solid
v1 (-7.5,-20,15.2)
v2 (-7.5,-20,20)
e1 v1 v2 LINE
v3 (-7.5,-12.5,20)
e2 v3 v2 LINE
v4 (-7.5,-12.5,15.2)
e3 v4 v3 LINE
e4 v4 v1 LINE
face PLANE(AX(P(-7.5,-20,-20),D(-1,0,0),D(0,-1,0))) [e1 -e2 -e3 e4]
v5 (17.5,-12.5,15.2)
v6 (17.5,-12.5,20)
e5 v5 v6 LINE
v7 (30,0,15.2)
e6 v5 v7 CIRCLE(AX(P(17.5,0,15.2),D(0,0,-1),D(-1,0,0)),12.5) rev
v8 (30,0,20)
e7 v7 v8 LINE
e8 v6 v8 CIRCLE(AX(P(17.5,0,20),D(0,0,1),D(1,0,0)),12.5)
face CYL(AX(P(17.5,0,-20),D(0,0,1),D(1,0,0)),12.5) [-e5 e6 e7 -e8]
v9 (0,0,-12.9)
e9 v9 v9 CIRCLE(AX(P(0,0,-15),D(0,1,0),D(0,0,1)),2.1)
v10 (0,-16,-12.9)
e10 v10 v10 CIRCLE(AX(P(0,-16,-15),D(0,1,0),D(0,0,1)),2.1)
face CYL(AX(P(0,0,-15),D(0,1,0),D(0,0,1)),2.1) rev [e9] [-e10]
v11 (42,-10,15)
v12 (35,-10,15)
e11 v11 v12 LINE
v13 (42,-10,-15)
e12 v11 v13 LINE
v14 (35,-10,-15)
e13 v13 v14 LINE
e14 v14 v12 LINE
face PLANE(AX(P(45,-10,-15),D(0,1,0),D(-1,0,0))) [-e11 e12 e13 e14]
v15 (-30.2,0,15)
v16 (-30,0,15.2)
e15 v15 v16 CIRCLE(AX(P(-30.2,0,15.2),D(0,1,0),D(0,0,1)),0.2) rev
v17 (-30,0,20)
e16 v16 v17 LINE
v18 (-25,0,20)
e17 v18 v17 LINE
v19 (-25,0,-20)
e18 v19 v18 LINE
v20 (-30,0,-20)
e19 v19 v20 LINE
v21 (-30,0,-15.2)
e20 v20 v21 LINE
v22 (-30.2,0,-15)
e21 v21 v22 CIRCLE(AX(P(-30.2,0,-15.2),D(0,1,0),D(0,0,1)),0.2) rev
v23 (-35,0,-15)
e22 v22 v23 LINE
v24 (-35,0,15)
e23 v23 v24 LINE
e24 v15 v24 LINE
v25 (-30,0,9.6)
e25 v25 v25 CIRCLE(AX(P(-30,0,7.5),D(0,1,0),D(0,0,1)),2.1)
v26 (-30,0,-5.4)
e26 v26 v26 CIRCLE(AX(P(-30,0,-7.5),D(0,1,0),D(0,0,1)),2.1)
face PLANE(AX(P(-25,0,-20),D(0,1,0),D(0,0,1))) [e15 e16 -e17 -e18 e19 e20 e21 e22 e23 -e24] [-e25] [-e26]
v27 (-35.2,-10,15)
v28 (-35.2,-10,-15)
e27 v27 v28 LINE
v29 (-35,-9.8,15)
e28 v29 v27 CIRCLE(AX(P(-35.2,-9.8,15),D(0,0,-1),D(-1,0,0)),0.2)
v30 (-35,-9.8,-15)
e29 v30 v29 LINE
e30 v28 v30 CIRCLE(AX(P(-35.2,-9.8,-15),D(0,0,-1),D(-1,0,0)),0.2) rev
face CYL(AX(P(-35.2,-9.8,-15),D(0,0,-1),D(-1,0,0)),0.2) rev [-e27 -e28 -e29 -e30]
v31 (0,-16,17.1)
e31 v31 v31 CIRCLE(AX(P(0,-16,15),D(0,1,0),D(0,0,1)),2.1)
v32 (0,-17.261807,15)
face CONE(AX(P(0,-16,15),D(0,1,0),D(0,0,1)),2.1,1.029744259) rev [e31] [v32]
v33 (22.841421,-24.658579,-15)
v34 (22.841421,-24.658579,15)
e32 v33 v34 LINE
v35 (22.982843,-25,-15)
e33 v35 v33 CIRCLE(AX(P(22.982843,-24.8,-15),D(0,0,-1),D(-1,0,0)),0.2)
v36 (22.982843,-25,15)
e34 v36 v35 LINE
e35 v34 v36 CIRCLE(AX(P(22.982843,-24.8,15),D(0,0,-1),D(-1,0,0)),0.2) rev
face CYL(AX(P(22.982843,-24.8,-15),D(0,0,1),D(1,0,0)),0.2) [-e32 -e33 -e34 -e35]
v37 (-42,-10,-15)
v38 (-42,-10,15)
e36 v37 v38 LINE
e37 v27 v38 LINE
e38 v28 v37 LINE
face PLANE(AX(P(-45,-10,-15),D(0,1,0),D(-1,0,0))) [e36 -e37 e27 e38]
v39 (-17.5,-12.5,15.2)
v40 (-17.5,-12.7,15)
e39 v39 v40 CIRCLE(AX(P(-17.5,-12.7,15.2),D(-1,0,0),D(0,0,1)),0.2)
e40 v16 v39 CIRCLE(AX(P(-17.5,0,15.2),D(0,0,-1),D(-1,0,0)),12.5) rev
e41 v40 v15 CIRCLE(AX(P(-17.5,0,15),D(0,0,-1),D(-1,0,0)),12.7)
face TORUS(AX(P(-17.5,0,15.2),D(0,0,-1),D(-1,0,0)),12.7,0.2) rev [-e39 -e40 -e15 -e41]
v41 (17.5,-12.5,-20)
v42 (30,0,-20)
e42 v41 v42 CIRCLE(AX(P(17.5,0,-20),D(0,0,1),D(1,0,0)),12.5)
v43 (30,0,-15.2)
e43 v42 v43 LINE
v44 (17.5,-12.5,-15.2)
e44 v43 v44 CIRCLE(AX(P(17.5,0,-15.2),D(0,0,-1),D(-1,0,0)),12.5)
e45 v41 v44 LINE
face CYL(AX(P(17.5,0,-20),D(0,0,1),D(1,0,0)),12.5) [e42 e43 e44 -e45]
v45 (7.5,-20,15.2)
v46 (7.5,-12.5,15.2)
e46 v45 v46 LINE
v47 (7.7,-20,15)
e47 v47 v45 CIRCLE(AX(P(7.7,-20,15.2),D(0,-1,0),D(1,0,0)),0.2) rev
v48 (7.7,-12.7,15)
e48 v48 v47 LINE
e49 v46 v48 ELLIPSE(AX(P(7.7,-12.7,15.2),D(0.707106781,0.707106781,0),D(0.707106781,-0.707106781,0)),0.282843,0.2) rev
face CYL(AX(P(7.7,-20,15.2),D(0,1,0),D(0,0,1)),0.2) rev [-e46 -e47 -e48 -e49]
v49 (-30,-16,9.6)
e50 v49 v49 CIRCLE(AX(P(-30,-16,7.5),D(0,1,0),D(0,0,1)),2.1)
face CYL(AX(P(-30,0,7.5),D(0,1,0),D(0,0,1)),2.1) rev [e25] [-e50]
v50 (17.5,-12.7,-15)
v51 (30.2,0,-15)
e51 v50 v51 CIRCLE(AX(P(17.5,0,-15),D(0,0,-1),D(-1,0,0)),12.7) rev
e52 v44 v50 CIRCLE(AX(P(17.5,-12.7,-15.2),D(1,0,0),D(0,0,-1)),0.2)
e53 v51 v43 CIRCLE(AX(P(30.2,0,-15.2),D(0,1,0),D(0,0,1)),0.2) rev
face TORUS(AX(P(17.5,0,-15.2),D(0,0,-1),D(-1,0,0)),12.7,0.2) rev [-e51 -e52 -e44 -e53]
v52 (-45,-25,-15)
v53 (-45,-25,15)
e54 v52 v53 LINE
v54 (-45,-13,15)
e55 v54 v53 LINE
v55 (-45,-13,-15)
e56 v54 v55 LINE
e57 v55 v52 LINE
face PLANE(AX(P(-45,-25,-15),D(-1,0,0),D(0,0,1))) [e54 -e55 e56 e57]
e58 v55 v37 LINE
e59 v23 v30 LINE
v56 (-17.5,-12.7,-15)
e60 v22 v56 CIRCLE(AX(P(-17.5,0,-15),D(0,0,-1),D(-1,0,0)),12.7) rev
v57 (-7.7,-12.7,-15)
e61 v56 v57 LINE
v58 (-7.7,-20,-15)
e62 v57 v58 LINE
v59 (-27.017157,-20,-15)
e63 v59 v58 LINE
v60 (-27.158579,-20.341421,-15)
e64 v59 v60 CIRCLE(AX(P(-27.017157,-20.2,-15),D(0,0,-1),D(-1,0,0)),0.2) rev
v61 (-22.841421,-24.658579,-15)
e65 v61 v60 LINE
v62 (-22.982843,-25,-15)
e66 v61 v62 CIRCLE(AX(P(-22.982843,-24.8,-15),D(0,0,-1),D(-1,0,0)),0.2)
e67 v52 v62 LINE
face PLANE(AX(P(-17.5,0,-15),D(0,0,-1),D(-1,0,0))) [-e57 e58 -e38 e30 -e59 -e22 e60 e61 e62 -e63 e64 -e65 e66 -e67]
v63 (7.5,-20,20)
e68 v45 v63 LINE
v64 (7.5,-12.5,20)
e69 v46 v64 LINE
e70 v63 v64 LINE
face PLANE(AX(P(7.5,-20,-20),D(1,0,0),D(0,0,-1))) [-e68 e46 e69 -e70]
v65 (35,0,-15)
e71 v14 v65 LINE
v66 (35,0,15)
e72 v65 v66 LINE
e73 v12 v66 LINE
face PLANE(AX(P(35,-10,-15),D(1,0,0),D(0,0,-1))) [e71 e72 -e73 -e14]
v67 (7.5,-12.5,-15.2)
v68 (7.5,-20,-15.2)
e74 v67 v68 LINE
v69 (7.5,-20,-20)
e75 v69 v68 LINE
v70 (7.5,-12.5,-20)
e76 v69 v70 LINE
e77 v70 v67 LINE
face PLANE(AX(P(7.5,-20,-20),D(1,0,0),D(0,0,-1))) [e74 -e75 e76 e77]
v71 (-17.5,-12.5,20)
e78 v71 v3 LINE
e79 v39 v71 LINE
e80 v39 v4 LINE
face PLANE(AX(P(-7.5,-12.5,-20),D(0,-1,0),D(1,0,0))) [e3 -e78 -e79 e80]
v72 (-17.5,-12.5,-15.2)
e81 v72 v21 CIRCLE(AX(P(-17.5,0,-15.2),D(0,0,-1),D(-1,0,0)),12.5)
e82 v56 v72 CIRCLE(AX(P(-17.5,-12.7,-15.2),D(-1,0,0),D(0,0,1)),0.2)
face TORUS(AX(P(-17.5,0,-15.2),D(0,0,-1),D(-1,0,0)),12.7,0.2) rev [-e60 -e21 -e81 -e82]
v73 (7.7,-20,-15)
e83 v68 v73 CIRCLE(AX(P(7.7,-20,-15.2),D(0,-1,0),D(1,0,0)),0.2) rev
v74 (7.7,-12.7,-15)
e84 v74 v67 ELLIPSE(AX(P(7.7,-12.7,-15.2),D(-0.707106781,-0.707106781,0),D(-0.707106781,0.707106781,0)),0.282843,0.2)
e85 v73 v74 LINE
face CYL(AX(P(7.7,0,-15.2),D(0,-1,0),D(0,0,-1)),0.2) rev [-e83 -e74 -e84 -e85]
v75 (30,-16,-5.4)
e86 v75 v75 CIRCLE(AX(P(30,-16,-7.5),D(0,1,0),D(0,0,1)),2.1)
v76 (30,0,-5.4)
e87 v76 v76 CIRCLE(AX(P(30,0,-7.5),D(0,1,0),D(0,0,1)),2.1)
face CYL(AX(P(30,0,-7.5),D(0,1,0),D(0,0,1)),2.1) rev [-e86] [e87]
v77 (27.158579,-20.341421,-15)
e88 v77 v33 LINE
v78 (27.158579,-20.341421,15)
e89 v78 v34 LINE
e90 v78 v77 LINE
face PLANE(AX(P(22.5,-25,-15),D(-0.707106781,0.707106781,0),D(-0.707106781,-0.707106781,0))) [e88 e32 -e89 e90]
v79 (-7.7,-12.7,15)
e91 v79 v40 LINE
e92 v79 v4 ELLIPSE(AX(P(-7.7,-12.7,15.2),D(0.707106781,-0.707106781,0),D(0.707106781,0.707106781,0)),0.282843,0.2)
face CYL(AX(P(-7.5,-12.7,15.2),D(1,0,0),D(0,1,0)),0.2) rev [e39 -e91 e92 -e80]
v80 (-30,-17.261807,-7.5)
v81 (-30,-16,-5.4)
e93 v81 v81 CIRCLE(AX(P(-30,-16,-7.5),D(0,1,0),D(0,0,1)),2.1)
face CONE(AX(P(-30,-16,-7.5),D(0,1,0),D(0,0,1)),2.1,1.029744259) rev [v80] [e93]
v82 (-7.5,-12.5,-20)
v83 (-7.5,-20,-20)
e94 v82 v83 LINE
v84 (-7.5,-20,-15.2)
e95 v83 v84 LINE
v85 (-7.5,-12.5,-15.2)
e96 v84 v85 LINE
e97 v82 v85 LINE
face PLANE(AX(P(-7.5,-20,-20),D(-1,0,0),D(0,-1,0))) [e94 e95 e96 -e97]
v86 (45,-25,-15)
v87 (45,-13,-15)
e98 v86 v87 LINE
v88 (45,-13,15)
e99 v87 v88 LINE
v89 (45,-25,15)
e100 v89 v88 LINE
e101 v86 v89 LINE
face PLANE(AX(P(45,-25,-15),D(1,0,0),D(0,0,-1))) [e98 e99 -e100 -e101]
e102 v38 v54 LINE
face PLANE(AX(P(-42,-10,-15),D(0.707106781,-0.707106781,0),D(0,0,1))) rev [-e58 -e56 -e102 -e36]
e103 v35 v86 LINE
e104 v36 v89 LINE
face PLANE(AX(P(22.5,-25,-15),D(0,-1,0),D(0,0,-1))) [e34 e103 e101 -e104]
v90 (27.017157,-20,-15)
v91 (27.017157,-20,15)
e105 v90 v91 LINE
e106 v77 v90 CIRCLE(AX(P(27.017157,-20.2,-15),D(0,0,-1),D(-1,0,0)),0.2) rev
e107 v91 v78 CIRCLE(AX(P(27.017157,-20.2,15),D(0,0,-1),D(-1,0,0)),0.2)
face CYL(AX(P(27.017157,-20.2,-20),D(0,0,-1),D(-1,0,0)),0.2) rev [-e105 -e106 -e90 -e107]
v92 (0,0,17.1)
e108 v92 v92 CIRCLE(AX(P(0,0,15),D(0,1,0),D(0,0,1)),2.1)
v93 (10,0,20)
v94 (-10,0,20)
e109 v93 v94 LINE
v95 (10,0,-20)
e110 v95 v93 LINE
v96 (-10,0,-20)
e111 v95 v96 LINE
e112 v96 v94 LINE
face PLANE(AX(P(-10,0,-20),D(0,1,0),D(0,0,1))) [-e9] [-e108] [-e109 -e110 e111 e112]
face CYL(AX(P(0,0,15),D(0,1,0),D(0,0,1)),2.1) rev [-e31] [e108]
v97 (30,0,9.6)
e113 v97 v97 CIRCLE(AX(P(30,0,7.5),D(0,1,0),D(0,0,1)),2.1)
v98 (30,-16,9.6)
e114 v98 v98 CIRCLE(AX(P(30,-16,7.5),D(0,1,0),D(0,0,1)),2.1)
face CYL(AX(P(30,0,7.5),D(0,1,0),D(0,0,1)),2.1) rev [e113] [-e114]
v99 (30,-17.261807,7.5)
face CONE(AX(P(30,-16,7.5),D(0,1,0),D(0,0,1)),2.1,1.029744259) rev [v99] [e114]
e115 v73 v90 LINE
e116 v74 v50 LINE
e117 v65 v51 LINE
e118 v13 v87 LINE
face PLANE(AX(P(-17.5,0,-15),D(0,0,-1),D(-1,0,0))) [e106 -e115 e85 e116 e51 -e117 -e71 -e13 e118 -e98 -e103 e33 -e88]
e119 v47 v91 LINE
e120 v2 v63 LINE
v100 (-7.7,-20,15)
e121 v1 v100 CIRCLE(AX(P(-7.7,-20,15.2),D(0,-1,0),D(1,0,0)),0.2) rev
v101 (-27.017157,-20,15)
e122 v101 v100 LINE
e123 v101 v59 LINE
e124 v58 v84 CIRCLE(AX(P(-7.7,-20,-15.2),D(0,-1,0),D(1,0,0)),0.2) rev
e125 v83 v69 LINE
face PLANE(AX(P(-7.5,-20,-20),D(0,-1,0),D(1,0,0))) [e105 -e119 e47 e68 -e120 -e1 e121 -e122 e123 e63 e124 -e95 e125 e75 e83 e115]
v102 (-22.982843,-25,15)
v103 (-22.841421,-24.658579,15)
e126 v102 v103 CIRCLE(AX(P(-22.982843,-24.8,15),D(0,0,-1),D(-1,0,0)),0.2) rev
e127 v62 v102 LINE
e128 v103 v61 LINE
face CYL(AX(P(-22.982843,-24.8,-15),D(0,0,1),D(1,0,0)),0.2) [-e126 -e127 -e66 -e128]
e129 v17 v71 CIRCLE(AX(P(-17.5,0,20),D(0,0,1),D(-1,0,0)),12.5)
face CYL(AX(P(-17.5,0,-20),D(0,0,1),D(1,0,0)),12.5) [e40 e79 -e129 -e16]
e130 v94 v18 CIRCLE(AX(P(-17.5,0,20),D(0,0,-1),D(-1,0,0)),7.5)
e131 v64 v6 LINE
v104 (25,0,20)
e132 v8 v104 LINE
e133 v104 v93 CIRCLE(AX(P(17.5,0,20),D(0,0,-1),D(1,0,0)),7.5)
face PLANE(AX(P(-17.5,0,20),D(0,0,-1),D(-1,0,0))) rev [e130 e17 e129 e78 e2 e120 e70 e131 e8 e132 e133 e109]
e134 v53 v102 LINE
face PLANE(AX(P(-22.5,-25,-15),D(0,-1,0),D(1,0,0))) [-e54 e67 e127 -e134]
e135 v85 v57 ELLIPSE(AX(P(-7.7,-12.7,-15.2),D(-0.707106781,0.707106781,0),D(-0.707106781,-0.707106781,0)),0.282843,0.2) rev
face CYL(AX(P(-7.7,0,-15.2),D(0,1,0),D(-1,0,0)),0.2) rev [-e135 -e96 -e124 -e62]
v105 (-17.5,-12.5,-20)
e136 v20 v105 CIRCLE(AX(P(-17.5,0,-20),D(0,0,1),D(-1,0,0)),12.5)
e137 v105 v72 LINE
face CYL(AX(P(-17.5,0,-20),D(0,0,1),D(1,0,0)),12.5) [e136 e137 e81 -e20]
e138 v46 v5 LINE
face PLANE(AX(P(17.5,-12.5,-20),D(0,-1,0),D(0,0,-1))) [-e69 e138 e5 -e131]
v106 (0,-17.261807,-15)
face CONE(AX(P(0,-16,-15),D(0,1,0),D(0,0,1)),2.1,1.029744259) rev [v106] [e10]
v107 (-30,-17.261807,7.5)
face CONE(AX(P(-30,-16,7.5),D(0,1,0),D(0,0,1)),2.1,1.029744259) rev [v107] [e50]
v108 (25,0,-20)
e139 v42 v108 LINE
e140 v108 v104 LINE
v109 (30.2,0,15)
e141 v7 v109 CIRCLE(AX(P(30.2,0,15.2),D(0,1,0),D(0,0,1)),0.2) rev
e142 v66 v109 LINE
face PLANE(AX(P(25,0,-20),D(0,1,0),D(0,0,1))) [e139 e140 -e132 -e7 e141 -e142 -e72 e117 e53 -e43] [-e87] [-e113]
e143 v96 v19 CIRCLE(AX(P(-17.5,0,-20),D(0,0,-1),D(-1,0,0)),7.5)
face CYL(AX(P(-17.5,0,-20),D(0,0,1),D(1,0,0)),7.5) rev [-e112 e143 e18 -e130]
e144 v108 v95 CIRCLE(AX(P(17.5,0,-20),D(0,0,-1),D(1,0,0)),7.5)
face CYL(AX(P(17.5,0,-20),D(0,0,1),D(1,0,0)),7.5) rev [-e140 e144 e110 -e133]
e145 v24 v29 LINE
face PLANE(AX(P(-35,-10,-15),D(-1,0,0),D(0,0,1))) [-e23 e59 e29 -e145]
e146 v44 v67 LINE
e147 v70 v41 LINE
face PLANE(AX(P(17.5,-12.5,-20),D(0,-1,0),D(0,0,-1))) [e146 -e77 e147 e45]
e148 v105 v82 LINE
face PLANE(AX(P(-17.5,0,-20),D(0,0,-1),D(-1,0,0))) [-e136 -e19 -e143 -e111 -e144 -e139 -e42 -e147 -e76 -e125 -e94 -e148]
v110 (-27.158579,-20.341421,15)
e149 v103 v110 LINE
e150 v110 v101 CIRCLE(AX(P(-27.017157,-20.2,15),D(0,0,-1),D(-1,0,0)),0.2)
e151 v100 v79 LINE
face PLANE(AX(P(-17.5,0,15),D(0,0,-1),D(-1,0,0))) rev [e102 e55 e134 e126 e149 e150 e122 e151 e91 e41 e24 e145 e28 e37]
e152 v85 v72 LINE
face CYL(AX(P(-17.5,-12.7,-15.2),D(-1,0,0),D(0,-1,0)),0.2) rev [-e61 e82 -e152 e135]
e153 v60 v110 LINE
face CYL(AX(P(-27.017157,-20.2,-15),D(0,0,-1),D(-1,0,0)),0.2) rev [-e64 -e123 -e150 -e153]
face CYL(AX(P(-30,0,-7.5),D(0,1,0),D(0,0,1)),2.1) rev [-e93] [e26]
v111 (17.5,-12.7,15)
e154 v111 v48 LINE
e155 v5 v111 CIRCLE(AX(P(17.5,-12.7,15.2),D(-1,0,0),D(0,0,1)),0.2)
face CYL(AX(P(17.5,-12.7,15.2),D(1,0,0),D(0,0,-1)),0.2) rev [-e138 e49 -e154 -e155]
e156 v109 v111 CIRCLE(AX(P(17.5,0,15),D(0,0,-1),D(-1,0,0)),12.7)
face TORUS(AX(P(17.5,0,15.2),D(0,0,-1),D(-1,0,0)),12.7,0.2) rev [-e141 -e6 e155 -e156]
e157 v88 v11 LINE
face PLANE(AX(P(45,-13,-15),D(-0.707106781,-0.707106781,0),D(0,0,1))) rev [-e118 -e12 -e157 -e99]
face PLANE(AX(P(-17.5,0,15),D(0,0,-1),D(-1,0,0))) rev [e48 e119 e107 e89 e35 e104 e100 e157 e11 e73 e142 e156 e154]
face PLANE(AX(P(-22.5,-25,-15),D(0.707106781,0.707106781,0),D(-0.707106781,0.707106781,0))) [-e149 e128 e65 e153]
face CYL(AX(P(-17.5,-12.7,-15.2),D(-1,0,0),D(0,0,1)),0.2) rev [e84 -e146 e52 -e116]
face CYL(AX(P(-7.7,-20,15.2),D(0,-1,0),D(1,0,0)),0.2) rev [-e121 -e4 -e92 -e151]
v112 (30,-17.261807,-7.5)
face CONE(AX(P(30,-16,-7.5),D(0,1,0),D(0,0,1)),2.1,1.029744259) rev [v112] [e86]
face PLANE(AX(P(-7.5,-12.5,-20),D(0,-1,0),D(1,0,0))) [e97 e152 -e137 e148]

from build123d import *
from build123d.topology import SkipClean

# Parameters (mm, degrees)
EXTRUDE_1_DEPTH       = 20
EXTRUDE_1_DEPTH_BACK  = 20
EXTRUDE_2_DEPTH       = 15
EXTRUDE_2_DEPTH_BACK  = 15
HOLE_WIZARD_M51_D     = 4.2
HOLE_WIZARD_M51_DEPTH = 16
HOLE_WIZARD_M51_TIP   = 1.2618073
CHAMFER_1_SIZE        = 3
FILLET_1_R            = 0.2
FILLET_2_R            = 0.2
FILLET_3_R            = 0.2


with BuildPart() as part:
    # Эскиз1 → Бобышка-Вытянуть1 (new, two sides: drawn at the far end of the back side and taken through both)
    with BuildSketch(Plane.XY.offset(-EXTRUDE_1_DEPTH_BACK)):
        with BuildLine():
            Line((17.5, -12.5), (7.5, -12.5))
            Line((7.5, -12.5), (7.5, -20))
            Line((7.5, -20), (-7.5, -20))
            Line((-7.5, -20), (-7.5, -12.5))
            Line((-7.5, -12.5), (-17.5, -12.5))
            ThreePointArc((-17.5, -12.5), (-26.338834765, -8.838834765), (-30, 0))
            Line((-30, 0), (-25, 0))
            ThreePointArc((-25, 0), (-17.5, -7.5), (-10, 0))
            Line((-10, 0), (10, 0))
            ThreePointArc((10, 0), (17.5, -7.5), (25, 0))
            Line((25, 0), (30, 0))
            ThreePointArc((30, 0), (26.338834765, -8.838834765), (17.5, -12.5))
        make_face()
    extrude(amount=EXTRUDE_1_DEPTH + EXTRUDE_1_DEPTH_BACK)

    # Эскиз2 → Бобышка-Вытянуть2 (add, two sides: drawn at the far end of the back side and taken through both)
    with SkipClean():  # the faces are left unmerged after this step: merging them gives an invalid solid
        with BuildSketch(Plane.XY.offset(-EXTRUDE_2_DEPTH_BACK)):
            with BuildLine():
                Line((22.5, -25), (45, -25))
                Line((45, -25), (45, -10))
                Line((45, -10), (35, -10))
                Line((35, -10), (35, 0))
                Line((35, 0), (25, 0))
                ThreePointArc((25, 0), (17.5, -7.5), (10, 0))
                Line((10, 0), (-10, 0))
                ThreePointArc((-10, 0), (-17.5, -7.5), (-25, 0))
                Line((-25, 0), (-35, 0))
                Line((-35, 0), (-35, -10))
                Line((-35, -10), (-45, -10))
                Line((-45, -10), (-45, -25))
                Line((-45, -25), (-22.5, -25))
                Line((-22.5, -25), (-27.5, -20))
                Line((-27.5, -20), (27.5, -20))
                Line((27.5, -20), (22.5, -25))
            make_face()
        extrude(amount=EXTRUDE_2_DEPTH + EXTRUDE_2_DEPTH_BACK)
    add(part.part.scale(1), mode=Mode.REPLACE)  # the faces are merged on a copy

    # Отверстие обработанное метчиком M51
    with Locations(Plane(origin=(0, 0, 0), x_dir=(1, 0, 0), z_dir=(0, 1, 0))):
        with Locations((-30, 7.5), (-30, -7.5), (0, 15), (0, -15), (30, -7.5), (30, 7.5)):
            Hole(HOLE_WIZARD_M51_D / 2, depth=HOLE_WIZARD_M51_DEPTH)
            with Locations((0, 0, -(HOLE_WIZARD_M51_DEPTH + HOLE_WIZARD_M51_TIP / 2))):  # 118° drill point
                Cone(0, HOLE_WIZARD_M51_D / 2, HOLE_WIZARD_M51_TIP, mode=Mode.SUBTRACT)

    # Фаска1
    chamfer_1_edges = [part.edges().sort_by_distance(p)[0] for p in [
        (-45, -10, 0),
        (45, -10, 0),
    ]]
    chamfer(chamfer_1_edges, length=CHAMFER_1_SIZE)

    # Скругление1
    fillet_1_edges = [part.edges().sort_by_distance(p)[0] for p in [
        (27.5, -20, 0),
        (22.5, -25, 0),
        (-27.5, -20, 0),
        (-22.5, -25, 0),
    ]]
    fillet(fillet_1_edges, radius=FILLET_1_R)

    # Скругление2
    fillet_2_edges = [part.edges().sort_by_distance(p)[0] for p in [
        (-35, -10, 0),
    ]]
    fillet(fillet_2_edges, radius=FILLET_2_R)

    # Скругление3
    fillet_3_edges = [part.edges().sort_by_distance(p)[0] for p in [
        (-12.5, -12.5, 15),
        (-12.5, -12.5, -15),
        (12.5, -12.5, -15),
        (26.338834765, -8.838834765, -15),
        (7.5, -16.25, -15),
        (12.5, -12.5, 15),
        (26.338834765, -8.838834765, 15),
        (-26.338834765, -8.838834765, 15),
        (-7.5, -16.25, 15),
        (7.5, -16.25, 15),
        (-26.338834765, -8.838834765, -15),
        (-7.5, -16.25, -15),
    ]]
    fillet(fillet_3_edges, radius=FILLET_3_R)


solid = part.part
